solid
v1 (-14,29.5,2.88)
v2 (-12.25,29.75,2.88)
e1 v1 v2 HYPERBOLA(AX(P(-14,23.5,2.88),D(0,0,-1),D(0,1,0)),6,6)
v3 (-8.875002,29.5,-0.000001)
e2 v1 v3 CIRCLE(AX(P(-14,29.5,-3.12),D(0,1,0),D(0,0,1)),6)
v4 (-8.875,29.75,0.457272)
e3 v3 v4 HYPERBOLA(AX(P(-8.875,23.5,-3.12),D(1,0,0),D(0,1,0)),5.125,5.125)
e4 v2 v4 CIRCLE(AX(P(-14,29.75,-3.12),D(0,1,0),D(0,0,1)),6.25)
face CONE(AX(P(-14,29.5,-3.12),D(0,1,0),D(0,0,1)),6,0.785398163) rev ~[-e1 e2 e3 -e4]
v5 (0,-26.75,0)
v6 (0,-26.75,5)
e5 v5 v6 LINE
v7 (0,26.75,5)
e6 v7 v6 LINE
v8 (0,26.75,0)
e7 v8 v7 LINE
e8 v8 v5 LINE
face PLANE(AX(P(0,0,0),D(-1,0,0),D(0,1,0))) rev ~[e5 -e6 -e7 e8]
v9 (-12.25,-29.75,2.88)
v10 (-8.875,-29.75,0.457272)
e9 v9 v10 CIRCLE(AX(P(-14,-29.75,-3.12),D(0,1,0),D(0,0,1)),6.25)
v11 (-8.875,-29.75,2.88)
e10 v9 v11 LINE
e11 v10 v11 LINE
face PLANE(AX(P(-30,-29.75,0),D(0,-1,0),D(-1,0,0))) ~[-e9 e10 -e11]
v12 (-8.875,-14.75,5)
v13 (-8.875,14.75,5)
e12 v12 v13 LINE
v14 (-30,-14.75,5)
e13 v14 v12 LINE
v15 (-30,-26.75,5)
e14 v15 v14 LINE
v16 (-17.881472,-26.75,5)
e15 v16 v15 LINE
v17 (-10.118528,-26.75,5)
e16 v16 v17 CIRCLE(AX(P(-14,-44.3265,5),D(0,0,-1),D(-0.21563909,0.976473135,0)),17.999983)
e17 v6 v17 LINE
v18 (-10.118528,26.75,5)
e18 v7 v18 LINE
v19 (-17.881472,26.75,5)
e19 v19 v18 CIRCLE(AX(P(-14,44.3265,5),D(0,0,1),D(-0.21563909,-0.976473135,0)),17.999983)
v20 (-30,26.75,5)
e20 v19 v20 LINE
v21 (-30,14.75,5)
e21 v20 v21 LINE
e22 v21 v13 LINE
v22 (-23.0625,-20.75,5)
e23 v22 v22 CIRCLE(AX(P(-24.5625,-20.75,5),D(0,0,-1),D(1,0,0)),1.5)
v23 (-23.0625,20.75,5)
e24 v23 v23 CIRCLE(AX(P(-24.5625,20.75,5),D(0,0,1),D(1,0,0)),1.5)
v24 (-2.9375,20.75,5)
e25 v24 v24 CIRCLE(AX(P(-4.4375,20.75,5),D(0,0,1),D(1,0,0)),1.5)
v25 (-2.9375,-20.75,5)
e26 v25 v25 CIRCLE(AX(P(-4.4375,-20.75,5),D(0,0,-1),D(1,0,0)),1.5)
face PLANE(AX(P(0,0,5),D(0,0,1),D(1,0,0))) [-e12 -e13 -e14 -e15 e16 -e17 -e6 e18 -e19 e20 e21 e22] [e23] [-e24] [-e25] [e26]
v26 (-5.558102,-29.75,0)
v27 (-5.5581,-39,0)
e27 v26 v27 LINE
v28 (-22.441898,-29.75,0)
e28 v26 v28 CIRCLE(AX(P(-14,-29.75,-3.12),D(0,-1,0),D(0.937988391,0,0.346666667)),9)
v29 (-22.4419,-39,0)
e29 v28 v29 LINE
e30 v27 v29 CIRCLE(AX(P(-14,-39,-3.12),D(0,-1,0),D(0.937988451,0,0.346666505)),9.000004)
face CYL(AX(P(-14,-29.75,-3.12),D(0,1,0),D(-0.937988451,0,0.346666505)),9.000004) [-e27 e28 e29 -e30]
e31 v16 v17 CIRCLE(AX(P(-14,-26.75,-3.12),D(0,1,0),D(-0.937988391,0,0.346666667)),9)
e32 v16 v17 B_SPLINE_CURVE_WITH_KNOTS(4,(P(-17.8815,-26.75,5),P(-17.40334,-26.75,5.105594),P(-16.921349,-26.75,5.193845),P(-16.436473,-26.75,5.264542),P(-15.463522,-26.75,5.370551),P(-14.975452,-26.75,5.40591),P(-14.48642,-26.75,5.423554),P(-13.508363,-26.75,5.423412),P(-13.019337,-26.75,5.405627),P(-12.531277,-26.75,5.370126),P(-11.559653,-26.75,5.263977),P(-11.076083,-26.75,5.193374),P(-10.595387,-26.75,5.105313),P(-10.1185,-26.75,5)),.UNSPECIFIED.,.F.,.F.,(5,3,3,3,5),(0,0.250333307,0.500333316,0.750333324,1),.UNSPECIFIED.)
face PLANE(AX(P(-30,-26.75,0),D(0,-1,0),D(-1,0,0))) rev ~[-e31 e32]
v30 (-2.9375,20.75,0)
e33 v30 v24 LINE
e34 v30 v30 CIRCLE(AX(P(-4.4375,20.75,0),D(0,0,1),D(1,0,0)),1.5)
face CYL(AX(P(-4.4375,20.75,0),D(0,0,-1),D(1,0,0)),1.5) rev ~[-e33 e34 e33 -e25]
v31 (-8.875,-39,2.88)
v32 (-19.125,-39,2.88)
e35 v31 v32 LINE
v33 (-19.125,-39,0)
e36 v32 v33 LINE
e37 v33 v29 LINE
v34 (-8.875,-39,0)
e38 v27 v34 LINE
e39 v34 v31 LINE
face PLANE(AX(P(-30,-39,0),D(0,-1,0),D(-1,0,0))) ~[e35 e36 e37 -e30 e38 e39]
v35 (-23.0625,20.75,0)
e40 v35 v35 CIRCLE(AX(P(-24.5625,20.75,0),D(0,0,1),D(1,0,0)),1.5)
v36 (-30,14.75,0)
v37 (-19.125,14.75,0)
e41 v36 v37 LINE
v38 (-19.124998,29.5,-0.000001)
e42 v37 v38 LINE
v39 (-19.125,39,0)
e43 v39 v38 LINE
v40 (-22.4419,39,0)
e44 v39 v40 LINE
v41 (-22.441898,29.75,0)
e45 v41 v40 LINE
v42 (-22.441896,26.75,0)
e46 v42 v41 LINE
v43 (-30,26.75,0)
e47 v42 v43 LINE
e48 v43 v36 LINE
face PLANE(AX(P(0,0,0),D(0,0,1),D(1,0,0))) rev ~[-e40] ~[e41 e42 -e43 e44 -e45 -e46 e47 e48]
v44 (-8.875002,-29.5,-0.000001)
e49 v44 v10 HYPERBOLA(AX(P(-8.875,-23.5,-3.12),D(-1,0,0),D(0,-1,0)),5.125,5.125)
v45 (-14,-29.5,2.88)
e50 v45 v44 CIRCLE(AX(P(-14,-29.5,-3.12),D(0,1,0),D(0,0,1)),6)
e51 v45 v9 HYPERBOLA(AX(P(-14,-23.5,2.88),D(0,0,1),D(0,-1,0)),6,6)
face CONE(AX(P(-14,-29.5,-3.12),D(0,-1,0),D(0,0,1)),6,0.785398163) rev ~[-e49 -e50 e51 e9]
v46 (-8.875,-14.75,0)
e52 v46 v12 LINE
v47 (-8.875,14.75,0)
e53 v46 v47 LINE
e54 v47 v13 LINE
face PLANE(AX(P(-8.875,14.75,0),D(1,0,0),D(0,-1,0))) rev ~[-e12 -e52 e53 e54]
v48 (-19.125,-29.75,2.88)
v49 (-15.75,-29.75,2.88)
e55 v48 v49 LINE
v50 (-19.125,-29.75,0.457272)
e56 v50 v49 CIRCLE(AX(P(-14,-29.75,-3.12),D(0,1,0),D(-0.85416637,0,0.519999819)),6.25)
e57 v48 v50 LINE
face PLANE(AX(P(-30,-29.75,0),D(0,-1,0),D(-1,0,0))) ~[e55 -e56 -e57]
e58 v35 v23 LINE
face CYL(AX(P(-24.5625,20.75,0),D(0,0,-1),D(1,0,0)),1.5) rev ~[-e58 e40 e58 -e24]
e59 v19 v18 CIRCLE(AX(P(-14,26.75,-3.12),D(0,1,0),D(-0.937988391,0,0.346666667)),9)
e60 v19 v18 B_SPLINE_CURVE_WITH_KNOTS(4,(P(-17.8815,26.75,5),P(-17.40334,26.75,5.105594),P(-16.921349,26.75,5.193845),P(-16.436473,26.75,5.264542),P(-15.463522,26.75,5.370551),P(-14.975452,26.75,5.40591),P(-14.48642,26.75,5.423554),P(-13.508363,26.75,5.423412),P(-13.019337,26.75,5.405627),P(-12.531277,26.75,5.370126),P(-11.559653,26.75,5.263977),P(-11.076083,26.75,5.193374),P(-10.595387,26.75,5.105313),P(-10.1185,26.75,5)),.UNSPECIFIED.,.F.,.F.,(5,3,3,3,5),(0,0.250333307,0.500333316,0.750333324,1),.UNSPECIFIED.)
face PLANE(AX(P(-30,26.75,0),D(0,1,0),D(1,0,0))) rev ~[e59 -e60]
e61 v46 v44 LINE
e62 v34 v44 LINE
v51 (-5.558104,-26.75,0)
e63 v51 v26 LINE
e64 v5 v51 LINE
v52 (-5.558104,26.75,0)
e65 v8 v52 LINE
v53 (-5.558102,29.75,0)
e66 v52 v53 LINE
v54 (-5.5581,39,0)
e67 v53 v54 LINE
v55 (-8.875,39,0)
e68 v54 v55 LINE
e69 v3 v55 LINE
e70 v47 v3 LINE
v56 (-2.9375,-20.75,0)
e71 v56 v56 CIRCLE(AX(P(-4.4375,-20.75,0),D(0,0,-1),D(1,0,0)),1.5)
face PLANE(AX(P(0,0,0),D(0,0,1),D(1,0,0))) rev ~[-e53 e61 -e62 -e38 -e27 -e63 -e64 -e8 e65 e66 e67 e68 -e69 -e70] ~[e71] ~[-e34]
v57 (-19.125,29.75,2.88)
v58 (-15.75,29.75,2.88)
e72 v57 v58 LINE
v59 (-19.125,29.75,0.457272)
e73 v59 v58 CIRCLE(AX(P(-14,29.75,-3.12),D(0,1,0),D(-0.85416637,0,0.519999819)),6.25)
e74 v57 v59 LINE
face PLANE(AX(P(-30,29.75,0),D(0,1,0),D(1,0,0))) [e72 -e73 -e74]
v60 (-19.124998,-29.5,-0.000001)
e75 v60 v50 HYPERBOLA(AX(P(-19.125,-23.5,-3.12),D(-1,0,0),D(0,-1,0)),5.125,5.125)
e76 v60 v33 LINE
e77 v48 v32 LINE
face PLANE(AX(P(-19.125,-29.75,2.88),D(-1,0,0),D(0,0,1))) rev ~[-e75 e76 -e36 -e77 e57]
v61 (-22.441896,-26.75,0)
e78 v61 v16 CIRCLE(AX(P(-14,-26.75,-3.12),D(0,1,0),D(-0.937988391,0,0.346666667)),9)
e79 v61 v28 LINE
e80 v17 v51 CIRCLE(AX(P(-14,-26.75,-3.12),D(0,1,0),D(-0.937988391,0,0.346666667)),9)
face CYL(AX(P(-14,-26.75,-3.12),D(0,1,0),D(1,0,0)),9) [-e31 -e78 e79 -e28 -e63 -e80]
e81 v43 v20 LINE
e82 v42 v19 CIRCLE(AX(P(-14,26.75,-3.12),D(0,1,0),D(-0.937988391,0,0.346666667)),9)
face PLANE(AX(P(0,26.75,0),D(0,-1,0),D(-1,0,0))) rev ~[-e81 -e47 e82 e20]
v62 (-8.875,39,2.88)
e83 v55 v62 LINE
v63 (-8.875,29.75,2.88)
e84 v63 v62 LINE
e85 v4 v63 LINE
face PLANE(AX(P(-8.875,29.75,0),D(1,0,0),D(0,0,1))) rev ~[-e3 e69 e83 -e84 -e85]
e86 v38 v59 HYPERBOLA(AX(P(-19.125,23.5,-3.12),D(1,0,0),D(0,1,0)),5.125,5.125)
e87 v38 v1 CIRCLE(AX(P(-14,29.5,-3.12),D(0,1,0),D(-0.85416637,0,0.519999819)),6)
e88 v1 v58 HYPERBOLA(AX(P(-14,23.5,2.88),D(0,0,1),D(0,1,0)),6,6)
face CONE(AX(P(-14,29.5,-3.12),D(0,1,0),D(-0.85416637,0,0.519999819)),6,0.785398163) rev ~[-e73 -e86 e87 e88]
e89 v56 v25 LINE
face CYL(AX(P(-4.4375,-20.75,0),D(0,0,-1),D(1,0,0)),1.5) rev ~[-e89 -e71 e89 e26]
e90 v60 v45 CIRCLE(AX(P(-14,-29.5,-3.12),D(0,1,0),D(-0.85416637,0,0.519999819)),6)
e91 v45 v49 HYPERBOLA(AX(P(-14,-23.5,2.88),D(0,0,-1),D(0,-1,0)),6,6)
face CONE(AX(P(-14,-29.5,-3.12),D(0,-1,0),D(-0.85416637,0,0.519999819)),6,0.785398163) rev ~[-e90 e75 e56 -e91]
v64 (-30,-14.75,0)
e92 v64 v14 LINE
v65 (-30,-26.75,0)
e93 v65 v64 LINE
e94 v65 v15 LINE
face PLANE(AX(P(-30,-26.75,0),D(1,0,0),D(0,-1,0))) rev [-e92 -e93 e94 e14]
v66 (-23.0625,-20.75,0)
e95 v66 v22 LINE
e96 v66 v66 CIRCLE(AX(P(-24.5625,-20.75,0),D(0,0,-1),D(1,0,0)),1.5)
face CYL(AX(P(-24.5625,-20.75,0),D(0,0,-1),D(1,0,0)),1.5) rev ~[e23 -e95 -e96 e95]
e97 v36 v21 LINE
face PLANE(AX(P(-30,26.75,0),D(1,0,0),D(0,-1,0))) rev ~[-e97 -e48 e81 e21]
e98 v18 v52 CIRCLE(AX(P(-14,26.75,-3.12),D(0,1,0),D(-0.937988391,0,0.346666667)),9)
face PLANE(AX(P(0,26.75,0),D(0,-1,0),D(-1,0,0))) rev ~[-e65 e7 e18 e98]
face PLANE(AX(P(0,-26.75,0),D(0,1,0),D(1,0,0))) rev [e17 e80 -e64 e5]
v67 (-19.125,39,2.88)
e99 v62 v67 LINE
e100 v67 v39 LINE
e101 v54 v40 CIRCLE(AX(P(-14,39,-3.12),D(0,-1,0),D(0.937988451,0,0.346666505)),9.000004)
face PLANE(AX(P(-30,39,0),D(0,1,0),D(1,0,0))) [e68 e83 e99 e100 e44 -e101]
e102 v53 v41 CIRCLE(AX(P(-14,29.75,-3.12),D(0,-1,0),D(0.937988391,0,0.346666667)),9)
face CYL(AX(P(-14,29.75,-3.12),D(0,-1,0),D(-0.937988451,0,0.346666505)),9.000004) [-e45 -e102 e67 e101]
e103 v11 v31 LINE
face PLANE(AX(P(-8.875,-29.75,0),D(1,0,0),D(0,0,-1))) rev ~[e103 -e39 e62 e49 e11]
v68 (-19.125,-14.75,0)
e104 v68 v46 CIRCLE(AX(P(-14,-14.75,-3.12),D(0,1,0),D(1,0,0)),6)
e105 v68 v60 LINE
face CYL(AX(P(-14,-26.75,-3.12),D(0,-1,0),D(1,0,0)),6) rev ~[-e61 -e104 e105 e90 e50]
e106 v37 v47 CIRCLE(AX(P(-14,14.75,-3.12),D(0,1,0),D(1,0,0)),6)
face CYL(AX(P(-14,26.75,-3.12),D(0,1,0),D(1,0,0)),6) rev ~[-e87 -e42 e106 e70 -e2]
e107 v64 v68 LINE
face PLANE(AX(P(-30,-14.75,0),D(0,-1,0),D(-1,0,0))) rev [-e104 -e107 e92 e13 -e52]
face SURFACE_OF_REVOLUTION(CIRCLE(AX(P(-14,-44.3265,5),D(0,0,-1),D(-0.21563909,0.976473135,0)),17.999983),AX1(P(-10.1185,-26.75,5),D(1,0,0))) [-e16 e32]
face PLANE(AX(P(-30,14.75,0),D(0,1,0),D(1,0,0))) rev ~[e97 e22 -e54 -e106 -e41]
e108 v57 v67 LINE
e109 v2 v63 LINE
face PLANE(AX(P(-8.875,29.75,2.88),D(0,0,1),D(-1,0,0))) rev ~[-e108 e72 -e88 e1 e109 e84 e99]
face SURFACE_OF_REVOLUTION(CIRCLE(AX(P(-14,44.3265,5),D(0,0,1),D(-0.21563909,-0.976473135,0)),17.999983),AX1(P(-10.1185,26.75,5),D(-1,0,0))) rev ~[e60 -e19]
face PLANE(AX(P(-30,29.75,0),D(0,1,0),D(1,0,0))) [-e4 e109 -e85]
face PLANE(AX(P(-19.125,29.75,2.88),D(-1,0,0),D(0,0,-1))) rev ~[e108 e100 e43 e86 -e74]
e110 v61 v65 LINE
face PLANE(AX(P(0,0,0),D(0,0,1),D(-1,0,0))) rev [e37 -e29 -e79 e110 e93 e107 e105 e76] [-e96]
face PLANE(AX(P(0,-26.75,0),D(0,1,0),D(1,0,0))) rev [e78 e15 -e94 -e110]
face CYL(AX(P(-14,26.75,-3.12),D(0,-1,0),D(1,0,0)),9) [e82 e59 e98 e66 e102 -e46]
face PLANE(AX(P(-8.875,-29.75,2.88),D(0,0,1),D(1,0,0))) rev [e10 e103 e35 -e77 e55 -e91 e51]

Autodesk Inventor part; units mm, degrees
ref_plane "YZ Plane" through (0, 0, 0) normal (1, 0, 0) x (0, 1, 0)
ref_plane "XZ Plane" through (0, 0, 0) normal (0, 1, 0) x (-1, 0, 0)
ref_plane "XY Plane" through (0, 0, 0) normal (0, 0, 1) x (1, 0, 0)
sketch "Náčrt1" plane through (0, 0, 0) normal (0, 0, 1) x (1, 0, 0)
  line L0 (0, 0) -> (0, 26.75)
  line L1 (0, 26.75) -> (-30, 26.75)
  line L2 (-30, 26.75) -> (-30, 14.75)
  line L3 (-30, 14.75) -> (-8.875, 14.75)
  line L4 (-8.875, 14.75) -> (-8.875, 0)
  line L5 (-8.875, 0) -> (0, 0)
  circle A0 centre (-24.5625, 20.75) radius 1.5
  circle A1 centre (-4.4375, 20.75) radius 1.5
  line L6 (-19.125, 26.75) -> (-19.125, 14.75) construction
  dimension "d0" = 30
  dimension "d1" = 26.75
  dimension "d3" = 12
  dimension "d4" = 8.875
  dimension "d5" = 3
  dimension "d6" = 3
  dimension "d7" = 6
  dimension "d9" = 10.875
  dimension "d10" = 5.4375
  dimension "d11" = 4.4375
extrude "Vysunutí1" add sketch "Náčrt1" along normal blind 5
sketch "Náčrt2" plane through (-30, 26.75, 0) normal (0, 1, 0) x (1, 0, 0)
  circle A0 centre (16, 3.12) radius 6
  line L0 (30, 0) -> (0, 0) projected
  line L1 (21.125, 0) -> (21.125, -5) projected
  line L2 (30, -5) -> (0, -5) projected
  line L3 (10.875, -5) -> (10.875, 0)
  circle A1 centre (16, 3.12) radius 9
  point P0 (24.4419, 0)
  point P1 (7.5581, 0)
  dimension "d1" = 26.75
  dimension "d14" = 12
  dimension "d15" = 10.25
  dimension "d20" = 18
extrude "Vysunutí2" add sketch "Náčrt2" along normal blind 3 contours L3 A1 L0 | A0 L1 A1 L2 L3 | L0 A1 L1 | L2 A1
extrude "Vysunutí3" cut sketch "Náčrt2" against normal through all contours L0 A0 picked at (15.3305, -1.5618)
sketch "Náčrt3" plane through (0, 0, 5) normal (0, 0, 1) x (1, 0, 0)
  line L0 (-22.4419, 26.75) -> (-17.8815, 26.75) projected
  line L1 (0, 26.75) -> (-10.1185, 26.75) projected
  arc A0 (-17.8815, 26.75) -> (-10.1185, 26.75) centre (-14, 44.3265) ccw
  line L2 (-10.1185, 26.75) -> (-17.8815, 26.75) projected
  point P0 (0, 0)
  dimension "d21" = 18
revolve "Rotace1" add sketch "Náčrt3" angle 360 about axis through (-10.1185, 26.75, 5) along (-1, 0, 0)
sketch "Náčrt4" plane through (-30, 29.75, 0) normal (0, 1, 0) x (1, 0, 0)
  line L0 (21.125, 0) -> (21.125, -2.88)
  line L1 (21.125, 0) -> (21.125, -5) projected
  arc A0 (10.875, 0) -> (21.125, 0) centre (16, 3.12) ccw projected
  line L2 (10.875, -2.88) -> (10.875, 0)
  line L3 (21.125, -2.88) -> (10.875, -2.88)
  arc A1 (7.5581, 0) -> (24.4419, 0) centre (16, 3.12) ccw projected
  line L4 (24.4419, 0) -> (21.125, 0) projected
  line L5 (10.875, 0) -> (7.5581, 0) projected
  point P0 (30, 0)
extrude "Vysunutí4" add sketch "Náčrt4" along normal blind 9.25 contours L4 A1 L1 L0 | L1 A1 L5 L2 L3
chamfer "Zkosení1" distance 0.25 angle 45 2 edges at (-16.9394, 29.75, 2.1107) (-11.0606, 29.75, 2.1107)
mirror "Zrcadlit1" about plane through (-8.875, 0, 0) normal (0, -1, 0)
properties part number "joný=gej"
